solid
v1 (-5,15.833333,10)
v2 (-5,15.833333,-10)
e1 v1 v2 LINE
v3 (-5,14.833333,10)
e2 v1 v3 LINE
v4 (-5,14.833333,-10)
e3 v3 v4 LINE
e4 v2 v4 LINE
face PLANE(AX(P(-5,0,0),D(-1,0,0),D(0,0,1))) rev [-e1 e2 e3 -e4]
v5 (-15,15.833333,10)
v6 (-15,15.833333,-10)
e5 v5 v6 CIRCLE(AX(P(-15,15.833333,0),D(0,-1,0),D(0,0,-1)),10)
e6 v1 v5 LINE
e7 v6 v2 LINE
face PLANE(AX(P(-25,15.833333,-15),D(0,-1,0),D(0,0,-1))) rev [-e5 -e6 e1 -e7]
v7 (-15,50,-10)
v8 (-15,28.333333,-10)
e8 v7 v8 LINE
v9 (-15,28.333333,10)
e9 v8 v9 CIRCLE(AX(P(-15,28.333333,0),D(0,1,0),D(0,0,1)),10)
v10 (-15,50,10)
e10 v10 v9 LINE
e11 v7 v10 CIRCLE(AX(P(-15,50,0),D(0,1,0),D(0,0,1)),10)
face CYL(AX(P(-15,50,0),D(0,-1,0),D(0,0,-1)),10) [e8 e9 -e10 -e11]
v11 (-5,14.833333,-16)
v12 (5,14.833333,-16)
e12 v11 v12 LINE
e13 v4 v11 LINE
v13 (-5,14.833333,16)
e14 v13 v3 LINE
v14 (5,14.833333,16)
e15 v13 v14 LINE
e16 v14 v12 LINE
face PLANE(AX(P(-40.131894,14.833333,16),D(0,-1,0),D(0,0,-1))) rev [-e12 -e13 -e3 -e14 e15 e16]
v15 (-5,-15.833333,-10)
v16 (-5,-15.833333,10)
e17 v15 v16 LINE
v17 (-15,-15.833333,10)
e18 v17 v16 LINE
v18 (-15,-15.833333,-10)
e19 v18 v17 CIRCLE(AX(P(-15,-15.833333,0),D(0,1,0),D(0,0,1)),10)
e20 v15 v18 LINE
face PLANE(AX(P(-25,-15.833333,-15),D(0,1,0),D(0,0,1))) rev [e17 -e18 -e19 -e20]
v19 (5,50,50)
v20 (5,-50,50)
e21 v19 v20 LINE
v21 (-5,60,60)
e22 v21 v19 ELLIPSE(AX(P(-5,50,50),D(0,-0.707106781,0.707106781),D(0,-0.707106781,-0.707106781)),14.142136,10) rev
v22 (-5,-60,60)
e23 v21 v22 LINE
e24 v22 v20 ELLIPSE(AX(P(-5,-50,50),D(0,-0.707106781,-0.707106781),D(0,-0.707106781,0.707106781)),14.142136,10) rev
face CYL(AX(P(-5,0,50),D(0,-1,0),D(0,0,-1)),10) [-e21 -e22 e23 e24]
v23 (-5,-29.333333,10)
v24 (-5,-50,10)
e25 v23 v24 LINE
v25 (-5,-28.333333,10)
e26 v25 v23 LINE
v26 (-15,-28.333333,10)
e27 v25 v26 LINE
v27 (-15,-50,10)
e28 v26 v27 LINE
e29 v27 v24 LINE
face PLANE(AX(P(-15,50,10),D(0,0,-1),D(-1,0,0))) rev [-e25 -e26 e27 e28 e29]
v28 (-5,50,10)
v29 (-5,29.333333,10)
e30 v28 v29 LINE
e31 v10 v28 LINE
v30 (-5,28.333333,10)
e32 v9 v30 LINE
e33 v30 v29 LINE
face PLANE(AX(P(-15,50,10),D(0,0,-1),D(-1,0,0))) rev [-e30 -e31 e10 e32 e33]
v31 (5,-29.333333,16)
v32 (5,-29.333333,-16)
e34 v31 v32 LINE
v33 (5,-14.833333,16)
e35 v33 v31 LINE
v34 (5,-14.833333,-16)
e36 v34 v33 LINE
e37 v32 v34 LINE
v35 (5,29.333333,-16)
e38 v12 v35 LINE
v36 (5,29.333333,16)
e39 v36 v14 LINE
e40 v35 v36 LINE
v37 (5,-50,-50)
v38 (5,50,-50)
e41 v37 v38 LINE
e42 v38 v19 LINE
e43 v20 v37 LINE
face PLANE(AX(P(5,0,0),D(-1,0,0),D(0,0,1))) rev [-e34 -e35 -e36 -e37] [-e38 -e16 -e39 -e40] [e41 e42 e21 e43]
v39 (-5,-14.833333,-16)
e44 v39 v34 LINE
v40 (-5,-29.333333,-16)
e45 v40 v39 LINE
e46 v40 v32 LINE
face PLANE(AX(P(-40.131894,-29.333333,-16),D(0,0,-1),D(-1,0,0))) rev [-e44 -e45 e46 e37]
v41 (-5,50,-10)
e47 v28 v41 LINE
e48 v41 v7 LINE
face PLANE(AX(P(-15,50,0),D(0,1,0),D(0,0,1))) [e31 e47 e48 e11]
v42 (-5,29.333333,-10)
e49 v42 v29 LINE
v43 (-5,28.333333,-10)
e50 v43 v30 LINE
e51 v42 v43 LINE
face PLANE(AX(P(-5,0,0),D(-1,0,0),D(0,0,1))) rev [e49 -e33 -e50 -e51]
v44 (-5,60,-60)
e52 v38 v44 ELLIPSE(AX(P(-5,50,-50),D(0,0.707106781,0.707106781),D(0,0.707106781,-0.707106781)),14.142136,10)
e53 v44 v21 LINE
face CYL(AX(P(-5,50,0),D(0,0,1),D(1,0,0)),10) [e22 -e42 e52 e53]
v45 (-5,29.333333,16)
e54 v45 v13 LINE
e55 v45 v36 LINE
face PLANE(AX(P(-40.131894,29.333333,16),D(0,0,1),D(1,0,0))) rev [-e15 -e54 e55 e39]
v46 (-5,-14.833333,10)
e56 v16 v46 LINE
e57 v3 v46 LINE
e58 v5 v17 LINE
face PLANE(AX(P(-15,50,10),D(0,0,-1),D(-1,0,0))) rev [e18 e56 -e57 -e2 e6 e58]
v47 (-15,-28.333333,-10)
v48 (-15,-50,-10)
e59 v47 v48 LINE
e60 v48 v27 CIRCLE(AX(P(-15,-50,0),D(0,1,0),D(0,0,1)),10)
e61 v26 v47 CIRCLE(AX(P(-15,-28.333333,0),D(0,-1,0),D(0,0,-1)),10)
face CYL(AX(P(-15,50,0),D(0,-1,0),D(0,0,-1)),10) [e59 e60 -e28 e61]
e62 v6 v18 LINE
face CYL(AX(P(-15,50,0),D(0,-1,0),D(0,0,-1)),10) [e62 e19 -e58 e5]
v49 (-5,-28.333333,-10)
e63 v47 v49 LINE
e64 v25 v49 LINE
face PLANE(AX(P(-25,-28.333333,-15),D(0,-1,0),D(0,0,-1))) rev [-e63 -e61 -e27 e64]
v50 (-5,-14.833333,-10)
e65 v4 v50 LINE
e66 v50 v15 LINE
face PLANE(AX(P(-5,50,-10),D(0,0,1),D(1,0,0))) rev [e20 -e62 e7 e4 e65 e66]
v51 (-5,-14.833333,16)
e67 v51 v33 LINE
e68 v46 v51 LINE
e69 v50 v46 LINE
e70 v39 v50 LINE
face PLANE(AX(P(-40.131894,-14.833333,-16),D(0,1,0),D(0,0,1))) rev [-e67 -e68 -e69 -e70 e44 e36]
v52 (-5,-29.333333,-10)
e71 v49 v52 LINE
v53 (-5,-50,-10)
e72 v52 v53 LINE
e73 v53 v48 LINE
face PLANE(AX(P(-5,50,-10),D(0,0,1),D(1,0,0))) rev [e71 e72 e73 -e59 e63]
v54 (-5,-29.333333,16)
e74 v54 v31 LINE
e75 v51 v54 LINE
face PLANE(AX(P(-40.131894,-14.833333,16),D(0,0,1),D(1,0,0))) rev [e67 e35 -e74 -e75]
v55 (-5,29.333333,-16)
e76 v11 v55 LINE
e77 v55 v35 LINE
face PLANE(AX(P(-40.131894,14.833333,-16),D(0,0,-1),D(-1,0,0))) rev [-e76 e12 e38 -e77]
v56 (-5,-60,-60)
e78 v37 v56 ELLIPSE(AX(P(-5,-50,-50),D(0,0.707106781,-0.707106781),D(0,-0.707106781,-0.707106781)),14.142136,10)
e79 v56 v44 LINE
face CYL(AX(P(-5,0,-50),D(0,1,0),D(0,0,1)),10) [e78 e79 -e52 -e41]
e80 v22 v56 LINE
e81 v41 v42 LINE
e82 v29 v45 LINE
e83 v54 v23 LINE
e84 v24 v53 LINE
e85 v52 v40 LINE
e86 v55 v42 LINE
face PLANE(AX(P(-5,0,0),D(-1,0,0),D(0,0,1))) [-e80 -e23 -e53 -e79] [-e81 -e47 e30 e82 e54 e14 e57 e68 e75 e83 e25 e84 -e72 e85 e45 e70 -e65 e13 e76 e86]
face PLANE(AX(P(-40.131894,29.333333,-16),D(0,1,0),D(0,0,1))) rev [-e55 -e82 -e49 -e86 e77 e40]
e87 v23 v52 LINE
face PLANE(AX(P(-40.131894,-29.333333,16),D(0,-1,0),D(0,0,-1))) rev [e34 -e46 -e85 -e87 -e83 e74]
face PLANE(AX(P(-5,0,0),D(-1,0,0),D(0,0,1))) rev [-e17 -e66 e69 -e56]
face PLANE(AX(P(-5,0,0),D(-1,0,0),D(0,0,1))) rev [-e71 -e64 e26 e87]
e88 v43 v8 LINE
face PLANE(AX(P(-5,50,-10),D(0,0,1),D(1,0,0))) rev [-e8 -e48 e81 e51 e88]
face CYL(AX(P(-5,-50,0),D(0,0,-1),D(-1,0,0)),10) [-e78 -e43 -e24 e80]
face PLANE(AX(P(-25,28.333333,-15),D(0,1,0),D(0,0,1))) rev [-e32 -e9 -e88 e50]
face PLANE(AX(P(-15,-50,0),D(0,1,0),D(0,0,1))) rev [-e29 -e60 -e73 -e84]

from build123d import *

# Parameters (mm, degrees)
SKETCH2_W           = 120
SKETCH2_H           = 120
BOSS_EXTRUDE1_DEPTH = 5
FILLET1_R           = 10
BOSS_EXTRUDE2_DEPTH = 50
SKETCH3_W           = 12.5
SKETCH3_H           = 30
CUT_EXTRUDE1_DEPTH  = 91
SKETCH5_W           = 14.5
SKETCH5_H           = 32
CUT_EXTRUDE2_DEPTH  = 10


with BuildPart() as part:
    # Sketch2 → Boss-Extrude1 (new, symmetric)
    with BuildSketch(Plane.YZ):
        Rectangle(SKETCH2_W, SKETCH2_H)
    extrude(amount=BOSS_EXTRUDE1_DEPTH, both=True)

    # Fillet1
    fillet1_edges = [part.edges().sort_by_distance(p)[0] for p in [
        (5, 60, 0),
        (5, 0, -60),
        (5, -60, 0),
        (5, 0, 60),
    ]]
    fillet(fillet1_edges, radius=FILLET1_R - 0.0001)  # a hair under: the kernel refuses the full size

    # Sketch4 → Boss-Extrude2 (add, symmetric)
    with BuildSketch(Plane(origin=(0, 0, 0), x_dir=(-1, 0, 0), z_dir=(0, 1, 0))):
        with BuildLine():
            Line((15, 10), (5, 10))
            Line((5, 10), (5, -10))
            Line((5, -10), (15, -10))
            ThreePointArc((15, -10), (25, 0), (15, 10))
        make_face()
    extrude(amount=BOSS_EXTRUDE2_DEPTH, both=True)

    # Sketch3 → Cut-Extrude1 (cut, through all)
    with BuildSketch(Plane.YZ.offset(5)):
        with Locations((-22.083333333, 0)):
            Rectangle(SKETCH3_W, SKETCH3_H)
        with Locations((22.083333333, 0)):
            Rectangle(SKETCH3_W, SKETCH3_H)
    extrude(amount=-CUT_EXTRUDE1_DEPTH, mode=Mode.SUBTRACT)

    # Sketch5 → Cut-Extrude2 (cut)
    with BuildSketch(Plane.YZ.offset(5)):
        with Locations((22.083333333, 0)):
            Rectangle(SKETCH5_W, SKETCH5_H)
        with Locations((-22.083333333, 0)):
            Rectangle(SKETCH5_W, SKETCH5_H)
    extrude(amount=-CUT_EXTRUDE2_DEPTH, mode=Mode.SUBTRACT)


solid = part.part
